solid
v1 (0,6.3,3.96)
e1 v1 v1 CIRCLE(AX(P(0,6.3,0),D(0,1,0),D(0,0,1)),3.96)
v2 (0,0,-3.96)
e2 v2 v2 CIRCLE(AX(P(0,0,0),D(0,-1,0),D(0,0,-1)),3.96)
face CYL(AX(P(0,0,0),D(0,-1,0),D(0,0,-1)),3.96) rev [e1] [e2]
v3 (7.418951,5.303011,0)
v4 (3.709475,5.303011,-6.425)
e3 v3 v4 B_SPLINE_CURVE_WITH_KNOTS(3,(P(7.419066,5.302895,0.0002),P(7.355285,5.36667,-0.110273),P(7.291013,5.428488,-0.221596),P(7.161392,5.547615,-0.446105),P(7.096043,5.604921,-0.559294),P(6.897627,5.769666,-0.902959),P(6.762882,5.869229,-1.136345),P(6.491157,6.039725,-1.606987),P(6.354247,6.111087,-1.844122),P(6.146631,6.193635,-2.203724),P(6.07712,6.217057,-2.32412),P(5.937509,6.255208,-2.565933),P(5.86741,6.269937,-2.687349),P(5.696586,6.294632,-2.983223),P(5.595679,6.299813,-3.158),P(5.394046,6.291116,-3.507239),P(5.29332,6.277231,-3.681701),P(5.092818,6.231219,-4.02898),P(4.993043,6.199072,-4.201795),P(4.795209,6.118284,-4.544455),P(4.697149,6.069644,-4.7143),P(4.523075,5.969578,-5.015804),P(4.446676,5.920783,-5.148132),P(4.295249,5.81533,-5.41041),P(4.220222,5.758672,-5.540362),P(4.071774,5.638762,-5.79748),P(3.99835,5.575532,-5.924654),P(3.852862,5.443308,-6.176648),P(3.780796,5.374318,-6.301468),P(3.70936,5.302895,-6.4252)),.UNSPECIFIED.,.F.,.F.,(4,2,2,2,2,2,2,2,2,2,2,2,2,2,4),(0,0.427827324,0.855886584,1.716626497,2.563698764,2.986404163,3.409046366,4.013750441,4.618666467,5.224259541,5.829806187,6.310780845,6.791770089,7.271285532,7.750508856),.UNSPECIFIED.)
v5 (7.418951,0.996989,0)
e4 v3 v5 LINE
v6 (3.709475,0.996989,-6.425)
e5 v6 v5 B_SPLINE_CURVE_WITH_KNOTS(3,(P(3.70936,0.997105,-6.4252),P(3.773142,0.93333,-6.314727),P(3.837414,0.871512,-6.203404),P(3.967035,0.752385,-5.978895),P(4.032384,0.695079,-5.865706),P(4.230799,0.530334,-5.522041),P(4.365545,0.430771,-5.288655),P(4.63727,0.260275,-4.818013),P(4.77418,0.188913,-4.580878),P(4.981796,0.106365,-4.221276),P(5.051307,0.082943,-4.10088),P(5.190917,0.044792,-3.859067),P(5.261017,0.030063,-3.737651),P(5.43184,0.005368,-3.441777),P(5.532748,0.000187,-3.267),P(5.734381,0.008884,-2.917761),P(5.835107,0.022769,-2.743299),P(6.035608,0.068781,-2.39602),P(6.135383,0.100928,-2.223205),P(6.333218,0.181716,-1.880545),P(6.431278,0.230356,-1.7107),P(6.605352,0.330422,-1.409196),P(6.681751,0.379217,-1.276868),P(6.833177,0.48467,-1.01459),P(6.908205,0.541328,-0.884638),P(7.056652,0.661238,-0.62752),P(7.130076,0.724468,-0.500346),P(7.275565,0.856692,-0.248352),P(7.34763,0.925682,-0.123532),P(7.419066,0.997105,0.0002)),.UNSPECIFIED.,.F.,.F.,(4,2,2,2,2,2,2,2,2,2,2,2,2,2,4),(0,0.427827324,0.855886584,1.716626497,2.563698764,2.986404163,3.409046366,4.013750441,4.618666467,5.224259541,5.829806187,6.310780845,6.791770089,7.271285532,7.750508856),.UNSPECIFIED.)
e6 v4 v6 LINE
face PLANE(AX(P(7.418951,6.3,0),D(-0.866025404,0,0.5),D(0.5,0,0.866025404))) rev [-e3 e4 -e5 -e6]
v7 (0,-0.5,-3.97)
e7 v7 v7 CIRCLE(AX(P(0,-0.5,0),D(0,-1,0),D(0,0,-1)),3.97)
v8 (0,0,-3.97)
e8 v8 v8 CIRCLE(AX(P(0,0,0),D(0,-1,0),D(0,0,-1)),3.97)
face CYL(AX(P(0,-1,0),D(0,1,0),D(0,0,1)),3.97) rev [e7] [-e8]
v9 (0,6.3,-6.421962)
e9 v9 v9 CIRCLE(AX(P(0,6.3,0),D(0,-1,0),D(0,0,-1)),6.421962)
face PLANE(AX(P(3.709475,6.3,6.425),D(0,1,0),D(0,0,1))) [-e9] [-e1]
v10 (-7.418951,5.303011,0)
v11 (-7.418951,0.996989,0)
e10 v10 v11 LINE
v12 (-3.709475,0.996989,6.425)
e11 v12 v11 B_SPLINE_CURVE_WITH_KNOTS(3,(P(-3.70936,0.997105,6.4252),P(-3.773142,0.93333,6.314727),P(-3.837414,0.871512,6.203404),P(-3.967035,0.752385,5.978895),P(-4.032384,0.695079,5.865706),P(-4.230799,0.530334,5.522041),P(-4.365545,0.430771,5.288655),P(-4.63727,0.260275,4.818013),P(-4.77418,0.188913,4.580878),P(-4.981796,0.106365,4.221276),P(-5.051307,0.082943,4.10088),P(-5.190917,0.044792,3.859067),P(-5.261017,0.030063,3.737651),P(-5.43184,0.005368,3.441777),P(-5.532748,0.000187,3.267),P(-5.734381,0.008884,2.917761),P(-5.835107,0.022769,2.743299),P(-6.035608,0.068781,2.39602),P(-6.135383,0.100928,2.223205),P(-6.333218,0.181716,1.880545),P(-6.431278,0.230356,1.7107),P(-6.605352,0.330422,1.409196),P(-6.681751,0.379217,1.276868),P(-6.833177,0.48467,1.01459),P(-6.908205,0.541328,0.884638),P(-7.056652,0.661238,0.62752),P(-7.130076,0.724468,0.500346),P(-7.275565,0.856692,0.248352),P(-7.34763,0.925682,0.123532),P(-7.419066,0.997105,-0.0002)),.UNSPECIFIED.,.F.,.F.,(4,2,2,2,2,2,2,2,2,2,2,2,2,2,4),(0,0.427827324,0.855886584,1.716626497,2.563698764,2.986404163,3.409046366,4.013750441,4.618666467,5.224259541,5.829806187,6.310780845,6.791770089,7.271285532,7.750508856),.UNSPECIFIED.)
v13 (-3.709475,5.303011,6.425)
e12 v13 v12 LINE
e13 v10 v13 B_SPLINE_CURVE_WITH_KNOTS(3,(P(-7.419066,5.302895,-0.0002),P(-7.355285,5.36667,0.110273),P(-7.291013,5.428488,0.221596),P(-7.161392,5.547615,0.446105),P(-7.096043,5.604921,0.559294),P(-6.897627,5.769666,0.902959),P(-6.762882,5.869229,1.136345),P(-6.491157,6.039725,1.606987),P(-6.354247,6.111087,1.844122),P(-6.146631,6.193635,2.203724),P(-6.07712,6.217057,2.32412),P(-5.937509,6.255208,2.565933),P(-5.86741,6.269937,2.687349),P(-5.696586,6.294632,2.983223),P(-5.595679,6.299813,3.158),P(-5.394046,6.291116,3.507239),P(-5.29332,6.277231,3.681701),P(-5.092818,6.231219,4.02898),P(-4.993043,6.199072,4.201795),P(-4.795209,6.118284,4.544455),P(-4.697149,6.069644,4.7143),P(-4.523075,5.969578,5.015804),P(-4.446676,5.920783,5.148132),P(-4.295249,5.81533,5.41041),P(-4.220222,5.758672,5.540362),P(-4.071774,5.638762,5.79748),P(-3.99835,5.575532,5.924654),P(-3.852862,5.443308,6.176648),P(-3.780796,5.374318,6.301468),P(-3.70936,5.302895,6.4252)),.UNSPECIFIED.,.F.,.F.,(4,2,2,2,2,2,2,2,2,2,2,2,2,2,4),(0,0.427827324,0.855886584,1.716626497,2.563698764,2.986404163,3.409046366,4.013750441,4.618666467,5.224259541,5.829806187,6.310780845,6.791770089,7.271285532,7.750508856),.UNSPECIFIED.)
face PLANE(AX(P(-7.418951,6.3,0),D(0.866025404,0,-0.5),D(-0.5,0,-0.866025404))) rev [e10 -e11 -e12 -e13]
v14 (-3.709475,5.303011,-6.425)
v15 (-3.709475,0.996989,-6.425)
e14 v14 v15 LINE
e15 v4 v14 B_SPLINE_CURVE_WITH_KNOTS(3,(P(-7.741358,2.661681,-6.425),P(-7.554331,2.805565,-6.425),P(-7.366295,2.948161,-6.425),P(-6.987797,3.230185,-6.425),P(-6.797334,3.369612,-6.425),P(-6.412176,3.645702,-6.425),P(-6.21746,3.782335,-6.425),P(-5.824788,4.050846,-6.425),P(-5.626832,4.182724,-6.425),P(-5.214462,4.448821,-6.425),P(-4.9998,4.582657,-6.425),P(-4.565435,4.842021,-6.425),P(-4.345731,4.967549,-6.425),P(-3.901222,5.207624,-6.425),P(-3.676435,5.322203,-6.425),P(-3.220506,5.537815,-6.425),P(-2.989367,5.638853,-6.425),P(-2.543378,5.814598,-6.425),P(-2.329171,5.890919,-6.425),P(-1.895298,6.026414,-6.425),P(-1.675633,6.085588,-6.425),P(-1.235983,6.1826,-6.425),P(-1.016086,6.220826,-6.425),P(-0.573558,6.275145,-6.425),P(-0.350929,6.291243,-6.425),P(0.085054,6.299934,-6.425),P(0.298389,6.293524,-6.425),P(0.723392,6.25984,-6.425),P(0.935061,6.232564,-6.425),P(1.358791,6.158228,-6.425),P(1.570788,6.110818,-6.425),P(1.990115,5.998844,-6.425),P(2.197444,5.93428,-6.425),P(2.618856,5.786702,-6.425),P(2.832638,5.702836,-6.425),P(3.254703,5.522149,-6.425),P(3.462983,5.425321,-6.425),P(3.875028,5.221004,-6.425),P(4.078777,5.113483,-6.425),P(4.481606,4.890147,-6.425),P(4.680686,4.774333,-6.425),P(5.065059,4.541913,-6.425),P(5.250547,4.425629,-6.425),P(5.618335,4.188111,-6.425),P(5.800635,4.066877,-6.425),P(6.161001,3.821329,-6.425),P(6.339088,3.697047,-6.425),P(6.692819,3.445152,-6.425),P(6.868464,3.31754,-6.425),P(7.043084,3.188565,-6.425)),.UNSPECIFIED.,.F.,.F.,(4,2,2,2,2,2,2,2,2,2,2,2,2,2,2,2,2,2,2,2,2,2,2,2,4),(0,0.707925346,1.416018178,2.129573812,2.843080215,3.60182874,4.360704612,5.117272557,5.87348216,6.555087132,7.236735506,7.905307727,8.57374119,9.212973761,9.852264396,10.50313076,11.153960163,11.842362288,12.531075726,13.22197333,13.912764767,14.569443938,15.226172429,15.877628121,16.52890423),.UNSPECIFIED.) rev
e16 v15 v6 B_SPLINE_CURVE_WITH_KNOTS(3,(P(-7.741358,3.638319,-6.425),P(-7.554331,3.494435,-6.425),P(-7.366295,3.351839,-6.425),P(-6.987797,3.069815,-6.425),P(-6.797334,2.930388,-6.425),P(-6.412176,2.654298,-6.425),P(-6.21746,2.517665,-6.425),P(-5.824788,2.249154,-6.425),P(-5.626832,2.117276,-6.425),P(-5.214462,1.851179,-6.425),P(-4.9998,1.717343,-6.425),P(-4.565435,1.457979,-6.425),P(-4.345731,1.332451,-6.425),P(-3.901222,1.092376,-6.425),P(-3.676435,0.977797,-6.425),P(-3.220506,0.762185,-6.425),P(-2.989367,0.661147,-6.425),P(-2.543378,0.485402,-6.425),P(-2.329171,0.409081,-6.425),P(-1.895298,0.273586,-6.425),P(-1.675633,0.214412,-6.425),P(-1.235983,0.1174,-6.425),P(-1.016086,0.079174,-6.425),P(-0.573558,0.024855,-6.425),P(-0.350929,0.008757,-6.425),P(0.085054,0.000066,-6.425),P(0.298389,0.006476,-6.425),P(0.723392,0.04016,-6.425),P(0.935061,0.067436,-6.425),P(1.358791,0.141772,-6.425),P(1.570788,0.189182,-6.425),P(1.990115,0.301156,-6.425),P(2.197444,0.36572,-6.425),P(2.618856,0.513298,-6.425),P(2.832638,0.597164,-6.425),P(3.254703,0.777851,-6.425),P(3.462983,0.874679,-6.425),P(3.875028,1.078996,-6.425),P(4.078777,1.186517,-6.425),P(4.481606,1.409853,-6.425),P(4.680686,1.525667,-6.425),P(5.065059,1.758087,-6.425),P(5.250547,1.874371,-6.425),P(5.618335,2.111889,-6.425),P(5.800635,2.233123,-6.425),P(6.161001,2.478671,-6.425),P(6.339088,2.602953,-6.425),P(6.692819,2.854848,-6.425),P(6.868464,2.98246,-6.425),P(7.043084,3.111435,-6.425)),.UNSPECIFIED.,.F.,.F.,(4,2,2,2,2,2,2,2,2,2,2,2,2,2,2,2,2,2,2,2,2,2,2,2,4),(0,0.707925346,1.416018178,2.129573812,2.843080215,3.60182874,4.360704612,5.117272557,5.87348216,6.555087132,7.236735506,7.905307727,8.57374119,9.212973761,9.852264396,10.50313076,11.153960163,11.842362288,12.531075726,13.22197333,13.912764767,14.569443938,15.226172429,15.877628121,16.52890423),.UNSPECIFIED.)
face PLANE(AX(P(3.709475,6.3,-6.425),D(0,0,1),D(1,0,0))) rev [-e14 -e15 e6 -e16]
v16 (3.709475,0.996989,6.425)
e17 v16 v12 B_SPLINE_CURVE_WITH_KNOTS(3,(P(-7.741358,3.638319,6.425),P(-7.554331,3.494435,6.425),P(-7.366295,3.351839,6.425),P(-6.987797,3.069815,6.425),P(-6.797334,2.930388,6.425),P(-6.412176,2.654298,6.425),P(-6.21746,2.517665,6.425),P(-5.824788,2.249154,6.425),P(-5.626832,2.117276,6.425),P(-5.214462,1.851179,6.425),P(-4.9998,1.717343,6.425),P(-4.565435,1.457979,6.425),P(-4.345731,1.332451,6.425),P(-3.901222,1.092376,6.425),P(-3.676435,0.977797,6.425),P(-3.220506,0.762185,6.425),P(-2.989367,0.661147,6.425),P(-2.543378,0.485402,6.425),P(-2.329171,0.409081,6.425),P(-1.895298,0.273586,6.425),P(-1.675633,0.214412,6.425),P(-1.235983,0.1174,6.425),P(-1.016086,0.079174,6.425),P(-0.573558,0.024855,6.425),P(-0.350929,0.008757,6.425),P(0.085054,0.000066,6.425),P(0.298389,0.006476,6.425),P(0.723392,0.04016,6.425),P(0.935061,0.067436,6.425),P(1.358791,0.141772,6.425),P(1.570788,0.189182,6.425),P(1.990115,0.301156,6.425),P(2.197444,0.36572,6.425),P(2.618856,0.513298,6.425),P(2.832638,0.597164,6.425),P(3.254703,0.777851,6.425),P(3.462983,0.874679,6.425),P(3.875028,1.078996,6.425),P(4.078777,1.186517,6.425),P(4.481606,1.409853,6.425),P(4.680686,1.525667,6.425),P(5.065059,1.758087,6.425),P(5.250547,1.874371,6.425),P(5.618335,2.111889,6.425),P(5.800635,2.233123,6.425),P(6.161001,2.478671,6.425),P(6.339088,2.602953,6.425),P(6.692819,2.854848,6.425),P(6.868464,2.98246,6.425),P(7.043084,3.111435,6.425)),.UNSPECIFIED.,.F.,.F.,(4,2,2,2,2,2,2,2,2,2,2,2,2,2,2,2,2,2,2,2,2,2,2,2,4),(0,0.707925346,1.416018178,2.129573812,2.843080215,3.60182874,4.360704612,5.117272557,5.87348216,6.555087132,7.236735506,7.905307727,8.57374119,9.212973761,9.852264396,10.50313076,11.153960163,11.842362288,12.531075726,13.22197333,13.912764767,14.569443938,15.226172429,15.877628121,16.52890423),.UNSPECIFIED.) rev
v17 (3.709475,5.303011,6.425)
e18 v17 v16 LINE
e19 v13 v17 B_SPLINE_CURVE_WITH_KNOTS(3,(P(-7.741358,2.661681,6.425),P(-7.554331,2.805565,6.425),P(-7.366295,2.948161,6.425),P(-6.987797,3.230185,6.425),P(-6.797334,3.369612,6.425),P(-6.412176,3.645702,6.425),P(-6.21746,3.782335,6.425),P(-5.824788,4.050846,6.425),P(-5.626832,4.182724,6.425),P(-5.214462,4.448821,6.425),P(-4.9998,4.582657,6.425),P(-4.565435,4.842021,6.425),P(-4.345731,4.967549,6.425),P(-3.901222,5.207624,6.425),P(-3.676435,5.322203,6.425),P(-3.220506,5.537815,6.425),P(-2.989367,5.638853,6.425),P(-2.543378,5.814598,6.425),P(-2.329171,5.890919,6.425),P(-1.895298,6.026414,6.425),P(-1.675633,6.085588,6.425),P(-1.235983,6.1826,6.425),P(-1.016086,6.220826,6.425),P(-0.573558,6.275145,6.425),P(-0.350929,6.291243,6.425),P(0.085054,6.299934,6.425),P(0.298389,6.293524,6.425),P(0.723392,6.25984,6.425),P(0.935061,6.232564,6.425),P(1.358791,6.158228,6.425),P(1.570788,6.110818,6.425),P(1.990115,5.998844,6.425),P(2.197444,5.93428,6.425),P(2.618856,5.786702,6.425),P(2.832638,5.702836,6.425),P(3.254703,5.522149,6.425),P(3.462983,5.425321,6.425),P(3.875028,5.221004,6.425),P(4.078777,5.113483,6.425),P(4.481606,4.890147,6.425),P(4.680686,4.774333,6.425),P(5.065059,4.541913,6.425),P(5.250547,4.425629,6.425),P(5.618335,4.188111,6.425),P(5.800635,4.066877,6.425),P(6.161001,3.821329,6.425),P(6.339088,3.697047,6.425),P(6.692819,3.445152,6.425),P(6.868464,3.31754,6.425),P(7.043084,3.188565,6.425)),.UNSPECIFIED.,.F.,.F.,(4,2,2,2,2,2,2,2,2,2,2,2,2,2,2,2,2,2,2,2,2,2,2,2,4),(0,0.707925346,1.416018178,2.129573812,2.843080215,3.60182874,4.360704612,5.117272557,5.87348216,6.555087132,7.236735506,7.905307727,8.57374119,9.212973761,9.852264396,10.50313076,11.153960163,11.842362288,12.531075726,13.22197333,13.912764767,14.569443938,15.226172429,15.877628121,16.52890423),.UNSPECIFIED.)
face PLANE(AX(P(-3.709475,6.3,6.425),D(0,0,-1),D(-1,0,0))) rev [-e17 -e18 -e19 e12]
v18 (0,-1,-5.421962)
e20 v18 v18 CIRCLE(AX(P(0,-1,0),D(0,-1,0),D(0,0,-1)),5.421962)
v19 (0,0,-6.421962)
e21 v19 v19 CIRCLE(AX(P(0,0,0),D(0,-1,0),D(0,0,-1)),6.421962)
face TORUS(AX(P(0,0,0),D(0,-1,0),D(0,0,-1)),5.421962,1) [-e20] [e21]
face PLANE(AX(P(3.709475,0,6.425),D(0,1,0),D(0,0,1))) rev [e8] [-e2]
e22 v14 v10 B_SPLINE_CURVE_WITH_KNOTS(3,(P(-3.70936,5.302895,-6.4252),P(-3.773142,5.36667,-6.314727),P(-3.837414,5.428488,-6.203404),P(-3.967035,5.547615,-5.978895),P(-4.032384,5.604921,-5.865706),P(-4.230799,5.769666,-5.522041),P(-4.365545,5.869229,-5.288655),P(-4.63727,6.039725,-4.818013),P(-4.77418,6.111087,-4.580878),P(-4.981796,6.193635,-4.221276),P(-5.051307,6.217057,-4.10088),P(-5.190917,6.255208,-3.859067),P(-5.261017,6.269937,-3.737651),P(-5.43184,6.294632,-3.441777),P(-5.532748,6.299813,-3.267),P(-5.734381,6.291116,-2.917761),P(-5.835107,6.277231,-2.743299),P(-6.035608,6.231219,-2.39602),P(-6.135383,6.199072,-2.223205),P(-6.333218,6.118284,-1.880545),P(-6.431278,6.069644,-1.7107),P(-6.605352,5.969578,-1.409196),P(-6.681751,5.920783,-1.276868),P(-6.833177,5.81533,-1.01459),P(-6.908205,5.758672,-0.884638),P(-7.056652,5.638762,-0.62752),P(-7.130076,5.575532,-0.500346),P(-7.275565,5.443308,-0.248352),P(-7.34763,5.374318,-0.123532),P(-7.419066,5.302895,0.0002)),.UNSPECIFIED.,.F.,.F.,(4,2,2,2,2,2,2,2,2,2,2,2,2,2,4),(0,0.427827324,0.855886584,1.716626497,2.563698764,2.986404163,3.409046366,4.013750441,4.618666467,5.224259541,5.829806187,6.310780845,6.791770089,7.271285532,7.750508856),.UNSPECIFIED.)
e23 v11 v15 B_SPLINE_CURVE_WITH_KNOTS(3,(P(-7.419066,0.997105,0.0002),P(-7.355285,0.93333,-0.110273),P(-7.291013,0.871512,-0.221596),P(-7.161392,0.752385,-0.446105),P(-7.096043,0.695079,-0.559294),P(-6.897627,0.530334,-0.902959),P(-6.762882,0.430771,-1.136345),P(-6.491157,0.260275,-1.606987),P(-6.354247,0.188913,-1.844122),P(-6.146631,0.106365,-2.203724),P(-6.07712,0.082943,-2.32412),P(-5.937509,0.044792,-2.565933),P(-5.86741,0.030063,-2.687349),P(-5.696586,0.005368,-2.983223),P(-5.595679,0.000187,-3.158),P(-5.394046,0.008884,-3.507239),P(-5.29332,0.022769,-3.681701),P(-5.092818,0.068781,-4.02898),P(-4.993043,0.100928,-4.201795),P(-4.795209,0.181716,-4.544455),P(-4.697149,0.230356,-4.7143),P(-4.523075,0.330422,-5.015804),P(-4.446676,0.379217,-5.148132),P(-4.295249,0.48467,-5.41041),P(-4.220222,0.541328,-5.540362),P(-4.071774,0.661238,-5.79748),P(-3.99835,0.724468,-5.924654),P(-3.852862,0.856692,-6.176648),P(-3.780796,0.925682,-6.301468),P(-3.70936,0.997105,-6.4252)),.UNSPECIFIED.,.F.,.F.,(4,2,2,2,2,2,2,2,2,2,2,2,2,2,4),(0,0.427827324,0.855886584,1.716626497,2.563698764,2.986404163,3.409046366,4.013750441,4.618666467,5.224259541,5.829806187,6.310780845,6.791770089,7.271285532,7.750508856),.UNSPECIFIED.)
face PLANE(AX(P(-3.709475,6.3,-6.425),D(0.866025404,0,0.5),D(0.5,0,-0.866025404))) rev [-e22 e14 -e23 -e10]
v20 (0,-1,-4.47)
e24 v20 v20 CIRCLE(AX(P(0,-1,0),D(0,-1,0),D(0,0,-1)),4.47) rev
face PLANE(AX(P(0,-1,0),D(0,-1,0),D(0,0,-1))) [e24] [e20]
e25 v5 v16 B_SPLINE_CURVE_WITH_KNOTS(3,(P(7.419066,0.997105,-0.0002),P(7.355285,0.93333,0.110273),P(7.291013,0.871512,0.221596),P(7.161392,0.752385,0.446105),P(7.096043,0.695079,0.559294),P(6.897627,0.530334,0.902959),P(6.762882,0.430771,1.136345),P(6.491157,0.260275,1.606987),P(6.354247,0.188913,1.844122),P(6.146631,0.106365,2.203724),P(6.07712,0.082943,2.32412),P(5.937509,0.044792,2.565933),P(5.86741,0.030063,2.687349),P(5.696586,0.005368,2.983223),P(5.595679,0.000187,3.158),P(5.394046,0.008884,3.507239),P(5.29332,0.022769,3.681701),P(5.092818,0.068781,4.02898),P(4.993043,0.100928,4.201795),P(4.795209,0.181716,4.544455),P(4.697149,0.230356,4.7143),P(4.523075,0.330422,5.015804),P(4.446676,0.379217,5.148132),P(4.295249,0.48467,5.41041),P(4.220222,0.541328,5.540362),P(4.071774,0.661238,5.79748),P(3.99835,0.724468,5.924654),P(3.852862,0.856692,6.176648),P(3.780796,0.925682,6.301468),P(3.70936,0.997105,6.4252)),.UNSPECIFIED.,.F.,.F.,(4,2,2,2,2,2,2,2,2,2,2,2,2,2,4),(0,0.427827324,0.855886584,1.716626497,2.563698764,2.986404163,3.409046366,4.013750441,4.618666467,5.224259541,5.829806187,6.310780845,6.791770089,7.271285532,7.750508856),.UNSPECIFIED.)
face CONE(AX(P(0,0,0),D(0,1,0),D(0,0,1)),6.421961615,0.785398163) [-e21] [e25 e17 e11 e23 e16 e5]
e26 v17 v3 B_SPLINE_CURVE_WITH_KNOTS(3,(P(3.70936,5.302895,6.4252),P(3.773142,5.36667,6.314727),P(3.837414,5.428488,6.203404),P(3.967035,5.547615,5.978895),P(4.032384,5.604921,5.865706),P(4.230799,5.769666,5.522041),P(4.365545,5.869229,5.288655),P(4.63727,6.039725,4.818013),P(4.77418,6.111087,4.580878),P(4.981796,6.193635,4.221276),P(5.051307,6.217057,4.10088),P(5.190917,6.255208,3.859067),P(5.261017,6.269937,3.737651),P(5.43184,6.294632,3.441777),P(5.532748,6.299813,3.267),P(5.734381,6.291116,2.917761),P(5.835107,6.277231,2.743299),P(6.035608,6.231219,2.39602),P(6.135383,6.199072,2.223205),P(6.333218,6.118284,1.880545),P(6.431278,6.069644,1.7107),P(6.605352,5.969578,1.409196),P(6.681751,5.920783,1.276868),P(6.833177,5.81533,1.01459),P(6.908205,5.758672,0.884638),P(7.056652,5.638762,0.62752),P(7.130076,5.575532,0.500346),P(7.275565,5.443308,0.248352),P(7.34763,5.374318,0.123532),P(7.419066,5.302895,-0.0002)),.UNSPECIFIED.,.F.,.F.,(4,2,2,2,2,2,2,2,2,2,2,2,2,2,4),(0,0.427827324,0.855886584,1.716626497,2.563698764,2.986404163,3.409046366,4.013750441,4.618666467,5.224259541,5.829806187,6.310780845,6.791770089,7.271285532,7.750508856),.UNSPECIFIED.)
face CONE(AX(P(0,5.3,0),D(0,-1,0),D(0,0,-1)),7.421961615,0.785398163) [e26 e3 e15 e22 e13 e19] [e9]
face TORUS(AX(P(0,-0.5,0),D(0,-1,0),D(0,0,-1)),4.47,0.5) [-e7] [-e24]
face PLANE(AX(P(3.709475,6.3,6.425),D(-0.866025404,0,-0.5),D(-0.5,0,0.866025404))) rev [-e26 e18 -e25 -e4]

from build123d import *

# Parameters (mm, degrees)
SKETCH1_R                    = 3.5
BOSS_EXTRUDE1_DEPTH          = 6.3
F_5_16_24_TAPPED_HOLE4_D     = 7.919999908
F_5_16_24_TAPPED_HOLE4_DEPTH = 12
F_5_16_24_TAPPED_HOLE4_TIP   = 2.379408024
SKETCH27_R                   = 6.421961615
SKETCH27_R_2                 = 3.97
BOSS_EXTRUDE2_DEPTH          = 1
FILLET2_R                    = 1
FILLET3_R                    = 0.5


with BuildPart() as part:
    # Sketch1 → Boss-Extrude1 (new body)
    with BuildSketch(Plane(origin=(0, 0, 0), x_dir=(1, 0, 0), z_dir=(0, 1, 0))):
        Polygon((3.70947548, -6.425), (7.418950959, 0), (3.70947548, 6.425), (-3.70947548, 6.425), (-7.418950959, 0), (-3.70947548, -6.425), align=None)
        with Locations(Location((0, 0, 0), (0, 0, 270))):
            Circle(SKETCH1_R, mode=Mode.SUBTRACT)
    extrude(amount=BOSS_EXTRUDE1_DEPTH)

    # Sketch3 → Cut-Revolve4 (revolve, cut)
    with BuildSketch(Plane.XY, mode=Mode.PRIVATE) as cut_revolve4_sk:
        Polygon((-6.421961615, 6.8), (-6.421961615, 6.3), (-7.421961615, 5.3), (-7.921961615, 5.3), (-7.921961615, 6.8), align=None)
        Polygon((-7.421961615, 1), (-6.421961615, 0), (-6.421961615, -0.5), (-7.921961615, -0.5), (-7.921961615, 1), align=None)
    revolve(cut_revolve4_sk.sketch.rotate(Axis((0, 0, 0), (0, 1, 0)), 120.000000074), axis=Axis((0, 0, 0), (0, 1, 0)), mode=Mode.SUBTRACT)

    # 5/16-24 Tapped Hole4
    with Locations(Plane.XZ):
        with Locations((0, 0)):
            Hole(F_5_16_24_TAPPED_HOLE4_D / 2, depth=F_5_16_24_TAPPED_HOLE4_DEPTH)
            with Locations((0, 0, -(F_5_16_24_TAPPED_HOLE4_DEPTH + F_5_16_24_TAPPED_HOLE4_TIP / 2))):  # 118° drill point
                Cone(0, F_5_16_24_TAPPED_HOLE4_D / 2, F_5_16_24_TAPPED_HOLE4_TIP, mode=Mode.SUBTRACT)

    # Sketch27 → Boss-Extrude2 (add)
    with BuildSketch(Plane.XZ):
        with Locations(Location((0, 0, 0), (0, 0, 270))):
            Circle(SKETCH27_R)
        with Locations(Location((0, 0, 0), (0, 0, 270))):
            Circle(SKETCH27_R_2, mode=Mode.SUBTRACT)
    extrude(amount=BOSS_EXTRUDE2_DEPTH)

    # Fillet2
    fillet2_edges = [part.edges().sort_by_distance(p)[0] for p in [
        (0, -1, 6.421961615),
    ]]
    fillet(fillet2_edges, radius=FILLET2_R - 0.0001)  # a hair under: the kernel refuses the full size

    # Fillet3
    fillet3_edges = [part.edges().sort_by_distance(p)[0] for p in [
        (0, -1, 3.97),
    ]]
    fillet(fillet3_edges, radius=FILLET3_R)


solid = part.part
